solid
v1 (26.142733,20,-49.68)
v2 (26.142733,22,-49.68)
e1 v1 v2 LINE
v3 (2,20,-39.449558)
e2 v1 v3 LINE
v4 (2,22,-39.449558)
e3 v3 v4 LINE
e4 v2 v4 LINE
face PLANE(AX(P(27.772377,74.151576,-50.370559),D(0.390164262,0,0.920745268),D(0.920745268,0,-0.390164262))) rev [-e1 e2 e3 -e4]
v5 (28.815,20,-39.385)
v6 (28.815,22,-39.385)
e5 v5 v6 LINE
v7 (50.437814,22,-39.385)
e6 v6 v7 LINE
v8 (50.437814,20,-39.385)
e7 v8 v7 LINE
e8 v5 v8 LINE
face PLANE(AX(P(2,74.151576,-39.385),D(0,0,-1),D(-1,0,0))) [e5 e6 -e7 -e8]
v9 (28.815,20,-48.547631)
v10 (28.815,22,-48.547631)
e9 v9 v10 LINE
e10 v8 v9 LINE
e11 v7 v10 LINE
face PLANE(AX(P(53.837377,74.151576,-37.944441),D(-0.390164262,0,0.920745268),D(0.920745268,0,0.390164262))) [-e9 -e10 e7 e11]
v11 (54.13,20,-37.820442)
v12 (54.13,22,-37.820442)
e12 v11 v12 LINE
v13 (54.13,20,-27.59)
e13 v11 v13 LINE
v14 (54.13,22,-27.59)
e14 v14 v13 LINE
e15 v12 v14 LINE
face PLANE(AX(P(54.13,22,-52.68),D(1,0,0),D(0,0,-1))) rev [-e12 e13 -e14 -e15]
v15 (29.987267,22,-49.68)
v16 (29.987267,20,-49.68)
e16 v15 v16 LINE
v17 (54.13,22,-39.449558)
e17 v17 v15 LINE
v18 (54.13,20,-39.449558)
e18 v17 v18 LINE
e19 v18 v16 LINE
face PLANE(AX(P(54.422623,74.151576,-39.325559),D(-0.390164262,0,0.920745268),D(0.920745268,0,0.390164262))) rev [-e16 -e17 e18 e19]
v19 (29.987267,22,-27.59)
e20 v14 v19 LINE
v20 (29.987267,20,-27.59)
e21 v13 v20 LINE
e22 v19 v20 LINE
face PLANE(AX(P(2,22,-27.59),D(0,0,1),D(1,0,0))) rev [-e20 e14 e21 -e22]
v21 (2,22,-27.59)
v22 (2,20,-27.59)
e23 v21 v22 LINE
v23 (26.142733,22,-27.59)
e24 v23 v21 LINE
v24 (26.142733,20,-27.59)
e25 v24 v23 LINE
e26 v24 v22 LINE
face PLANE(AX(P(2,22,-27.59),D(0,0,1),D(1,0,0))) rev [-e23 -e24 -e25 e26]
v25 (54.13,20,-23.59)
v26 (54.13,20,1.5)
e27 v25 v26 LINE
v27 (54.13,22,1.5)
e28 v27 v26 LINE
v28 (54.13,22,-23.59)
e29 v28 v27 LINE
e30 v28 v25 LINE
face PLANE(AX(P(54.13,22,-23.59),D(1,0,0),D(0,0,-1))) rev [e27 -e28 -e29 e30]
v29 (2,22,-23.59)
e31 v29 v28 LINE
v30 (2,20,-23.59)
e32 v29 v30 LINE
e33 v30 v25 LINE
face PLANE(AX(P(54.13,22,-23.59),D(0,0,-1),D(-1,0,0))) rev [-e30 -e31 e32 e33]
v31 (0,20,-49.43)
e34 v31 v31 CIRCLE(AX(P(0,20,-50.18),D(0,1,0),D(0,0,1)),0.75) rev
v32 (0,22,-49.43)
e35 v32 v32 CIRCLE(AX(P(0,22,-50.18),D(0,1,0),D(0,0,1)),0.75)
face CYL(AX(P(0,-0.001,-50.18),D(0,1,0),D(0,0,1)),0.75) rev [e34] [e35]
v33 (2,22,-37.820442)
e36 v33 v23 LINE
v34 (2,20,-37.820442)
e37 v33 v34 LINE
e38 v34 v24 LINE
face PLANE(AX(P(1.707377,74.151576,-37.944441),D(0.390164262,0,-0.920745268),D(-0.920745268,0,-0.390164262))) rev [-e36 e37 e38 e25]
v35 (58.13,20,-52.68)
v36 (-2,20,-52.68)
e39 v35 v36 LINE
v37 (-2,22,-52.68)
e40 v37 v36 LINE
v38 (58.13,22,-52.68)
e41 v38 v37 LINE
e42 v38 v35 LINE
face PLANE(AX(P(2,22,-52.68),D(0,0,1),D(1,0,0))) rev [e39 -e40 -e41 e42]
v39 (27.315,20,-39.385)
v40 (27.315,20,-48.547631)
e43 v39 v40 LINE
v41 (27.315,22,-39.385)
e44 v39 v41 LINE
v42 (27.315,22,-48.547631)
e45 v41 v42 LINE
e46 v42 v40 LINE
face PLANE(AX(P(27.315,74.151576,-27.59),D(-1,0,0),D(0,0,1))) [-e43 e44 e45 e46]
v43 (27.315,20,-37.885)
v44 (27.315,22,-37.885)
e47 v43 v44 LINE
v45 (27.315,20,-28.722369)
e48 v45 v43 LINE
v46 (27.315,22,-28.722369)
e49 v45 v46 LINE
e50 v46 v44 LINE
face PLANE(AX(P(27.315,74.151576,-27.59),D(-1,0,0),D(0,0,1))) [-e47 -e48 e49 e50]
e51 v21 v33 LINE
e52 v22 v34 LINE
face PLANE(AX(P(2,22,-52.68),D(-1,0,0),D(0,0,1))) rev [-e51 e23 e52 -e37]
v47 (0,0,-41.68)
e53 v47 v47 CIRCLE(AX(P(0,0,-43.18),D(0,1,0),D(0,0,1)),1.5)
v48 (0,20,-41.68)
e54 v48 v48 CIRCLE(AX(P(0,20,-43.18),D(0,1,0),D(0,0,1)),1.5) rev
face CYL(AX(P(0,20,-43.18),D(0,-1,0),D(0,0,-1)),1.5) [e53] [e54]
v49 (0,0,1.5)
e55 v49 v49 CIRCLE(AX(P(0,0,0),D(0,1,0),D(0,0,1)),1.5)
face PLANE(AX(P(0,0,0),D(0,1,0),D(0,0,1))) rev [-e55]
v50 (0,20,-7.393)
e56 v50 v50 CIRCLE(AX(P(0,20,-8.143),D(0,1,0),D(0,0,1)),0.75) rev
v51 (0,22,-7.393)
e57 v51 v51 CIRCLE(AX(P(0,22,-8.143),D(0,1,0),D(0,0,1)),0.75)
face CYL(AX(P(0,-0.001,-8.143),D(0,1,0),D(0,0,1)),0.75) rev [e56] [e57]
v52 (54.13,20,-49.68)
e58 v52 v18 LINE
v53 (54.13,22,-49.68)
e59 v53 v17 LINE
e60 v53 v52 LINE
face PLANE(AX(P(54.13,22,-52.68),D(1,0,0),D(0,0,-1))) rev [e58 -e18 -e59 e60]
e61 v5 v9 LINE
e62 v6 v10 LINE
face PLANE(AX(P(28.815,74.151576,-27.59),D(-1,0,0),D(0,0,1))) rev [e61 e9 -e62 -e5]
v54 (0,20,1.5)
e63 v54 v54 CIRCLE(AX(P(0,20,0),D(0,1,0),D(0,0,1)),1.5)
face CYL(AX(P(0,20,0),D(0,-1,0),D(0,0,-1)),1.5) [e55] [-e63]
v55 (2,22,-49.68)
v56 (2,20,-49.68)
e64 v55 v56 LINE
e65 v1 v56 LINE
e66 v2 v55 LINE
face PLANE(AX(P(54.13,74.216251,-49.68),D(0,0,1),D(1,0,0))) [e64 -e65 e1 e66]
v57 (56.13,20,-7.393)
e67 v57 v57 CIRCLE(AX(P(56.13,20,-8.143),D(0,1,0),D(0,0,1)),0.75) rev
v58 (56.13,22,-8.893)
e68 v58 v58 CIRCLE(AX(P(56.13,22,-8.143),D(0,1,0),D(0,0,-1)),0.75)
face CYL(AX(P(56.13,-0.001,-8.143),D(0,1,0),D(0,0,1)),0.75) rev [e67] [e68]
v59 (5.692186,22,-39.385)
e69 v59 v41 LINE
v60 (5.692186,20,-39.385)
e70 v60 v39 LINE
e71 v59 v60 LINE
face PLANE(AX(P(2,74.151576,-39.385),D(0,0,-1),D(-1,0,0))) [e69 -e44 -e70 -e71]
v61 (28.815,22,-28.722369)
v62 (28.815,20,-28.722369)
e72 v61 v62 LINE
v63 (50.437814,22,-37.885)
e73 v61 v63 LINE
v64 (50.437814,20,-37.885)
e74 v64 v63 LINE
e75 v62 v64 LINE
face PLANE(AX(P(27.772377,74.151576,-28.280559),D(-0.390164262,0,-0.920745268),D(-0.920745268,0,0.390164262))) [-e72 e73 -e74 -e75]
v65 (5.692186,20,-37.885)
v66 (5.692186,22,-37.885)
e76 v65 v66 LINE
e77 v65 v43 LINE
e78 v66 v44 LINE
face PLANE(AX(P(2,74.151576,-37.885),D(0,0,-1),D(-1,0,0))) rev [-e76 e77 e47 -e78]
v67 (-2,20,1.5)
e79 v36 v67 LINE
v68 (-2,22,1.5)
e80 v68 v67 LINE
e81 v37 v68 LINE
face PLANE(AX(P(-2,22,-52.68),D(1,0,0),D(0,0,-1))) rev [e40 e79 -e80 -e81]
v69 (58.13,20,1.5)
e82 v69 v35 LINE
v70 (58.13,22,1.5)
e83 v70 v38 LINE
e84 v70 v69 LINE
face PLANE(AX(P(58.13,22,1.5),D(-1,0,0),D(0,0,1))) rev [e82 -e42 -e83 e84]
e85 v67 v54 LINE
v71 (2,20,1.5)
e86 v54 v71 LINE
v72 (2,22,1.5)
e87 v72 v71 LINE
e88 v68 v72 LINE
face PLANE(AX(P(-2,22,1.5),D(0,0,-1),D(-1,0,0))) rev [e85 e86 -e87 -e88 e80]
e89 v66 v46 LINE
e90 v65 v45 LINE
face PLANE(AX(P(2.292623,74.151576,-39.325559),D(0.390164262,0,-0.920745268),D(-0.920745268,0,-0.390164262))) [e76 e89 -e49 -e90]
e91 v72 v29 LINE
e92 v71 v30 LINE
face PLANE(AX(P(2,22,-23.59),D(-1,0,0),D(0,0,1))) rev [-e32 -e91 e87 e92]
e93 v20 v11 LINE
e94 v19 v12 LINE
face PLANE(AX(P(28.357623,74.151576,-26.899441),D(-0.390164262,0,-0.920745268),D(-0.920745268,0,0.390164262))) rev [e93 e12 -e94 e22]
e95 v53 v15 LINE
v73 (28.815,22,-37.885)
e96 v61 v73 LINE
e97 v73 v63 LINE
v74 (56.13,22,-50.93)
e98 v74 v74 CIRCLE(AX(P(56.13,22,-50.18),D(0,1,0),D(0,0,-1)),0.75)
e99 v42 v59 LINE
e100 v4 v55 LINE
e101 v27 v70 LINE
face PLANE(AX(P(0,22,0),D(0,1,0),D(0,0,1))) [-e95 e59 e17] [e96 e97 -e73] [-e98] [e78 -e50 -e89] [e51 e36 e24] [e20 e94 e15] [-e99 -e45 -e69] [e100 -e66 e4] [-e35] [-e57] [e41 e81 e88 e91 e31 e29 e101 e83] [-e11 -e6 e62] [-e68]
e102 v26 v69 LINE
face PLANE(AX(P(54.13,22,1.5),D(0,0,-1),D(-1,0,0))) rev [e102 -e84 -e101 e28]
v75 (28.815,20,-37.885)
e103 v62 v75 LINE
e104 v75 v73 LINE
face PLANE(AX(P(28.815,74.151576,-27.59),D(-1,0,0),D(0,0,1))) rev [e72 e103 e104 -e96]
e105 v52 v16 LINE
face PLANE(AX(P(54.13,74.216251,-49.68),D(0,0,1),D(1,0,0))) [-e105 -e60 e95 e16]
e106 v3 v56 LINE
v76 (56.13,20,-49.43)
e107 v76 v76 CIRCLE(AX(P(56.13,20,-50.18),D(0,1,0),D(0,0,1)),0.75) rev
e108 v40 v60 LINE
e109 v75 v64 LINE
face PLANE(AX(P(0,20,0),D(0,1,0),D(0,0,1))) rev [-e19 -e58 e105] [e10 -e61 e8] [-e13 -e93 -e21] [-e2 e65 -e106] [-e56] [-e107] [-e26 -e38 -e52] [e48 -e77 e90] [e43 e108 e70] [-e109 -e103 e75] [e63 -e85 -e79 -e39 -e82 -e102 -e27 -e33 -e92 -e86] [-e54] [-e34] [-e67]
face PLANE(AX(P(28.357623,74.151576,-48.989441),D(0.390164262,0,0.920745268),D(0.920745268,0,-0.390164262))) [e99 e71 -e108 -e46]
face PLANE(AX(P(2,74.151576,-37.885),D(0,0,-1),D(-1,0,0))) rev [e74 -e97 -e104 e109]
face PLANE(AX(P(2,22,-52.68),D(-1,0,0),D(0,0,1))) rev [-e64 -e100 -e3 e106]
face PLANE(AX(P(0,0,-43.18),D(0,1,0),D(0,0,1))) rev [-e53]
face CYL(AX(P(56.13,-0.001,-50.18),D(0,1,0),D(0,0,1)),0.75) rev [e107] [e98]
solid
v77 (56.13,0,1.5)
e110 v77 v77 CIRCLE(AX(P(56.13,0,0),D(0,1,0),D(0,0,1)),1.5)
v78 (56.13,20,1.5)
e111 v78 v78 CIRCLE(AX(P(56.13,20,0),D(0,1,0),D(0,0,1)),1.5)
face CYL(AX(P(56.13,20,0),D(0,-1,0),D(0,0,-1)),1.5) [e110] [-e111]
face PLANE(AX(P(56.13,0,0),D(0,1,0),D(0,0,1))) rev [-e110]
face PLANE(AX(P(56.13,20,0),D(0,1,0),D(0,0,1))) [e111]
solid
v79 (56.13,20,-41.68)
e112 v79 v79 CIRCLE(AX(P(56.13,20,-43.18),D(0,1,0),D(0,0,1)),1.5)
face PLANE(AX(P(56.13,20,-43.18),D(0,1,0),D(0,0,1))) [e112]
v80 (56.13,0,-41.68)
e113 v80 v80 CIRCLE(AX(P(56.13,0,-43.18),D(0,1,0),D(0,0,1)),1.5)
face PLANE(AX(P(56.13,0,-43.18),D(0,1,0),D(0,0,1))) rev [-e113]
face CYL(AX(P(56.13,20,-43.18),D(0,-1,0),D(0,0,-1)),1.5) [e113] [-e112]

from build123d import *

# Parameters (mm, degrees)
SKETCH_1_R          = 1.5
EXTRUDE_1_DEPTH     = 20
EXTRUDE_1_2_DEPTH   = 20
EXTRUDE_1_3_DEPTH   = 20
EXTRUDE_1_4_DEPTH   = 20
EXTRUDE_2_DEPTH     = 2
SKETCH_4_R          = 0.75
CUT_EXTRUDE_1_DEPTH = 2
SKETCH_5_W          = 52.13
SKETCH_5_H          = 3
EXTRUDE_3_DEPTH     = 2
EXTRUDE_START       = -2
EXTRUDE_3_2_DEPTH   = 2


# Read off the part's stored shape, not the designer's step: 拉伸-薄壁3
with BuildPart() as part:
    # 草图1 → 凸台-拉伸1 (new body)
    with BuildSketch(Plane(origin=(0, 0, 0), x_dir=(1, 0, 0), z_dir=(0, 1, 0))):
        with Locations(Location((0, 0, 0), (0, 0, 270))):
            Circle(SKETCH_1_R)
    extrude(amount=EXTRUDE_1_DEPTH)



with BuildPart() as body_2:
    # 草图1 → Extrude 1 2 (new body)
    with BuildSketch(Plane(origin=(0, 0, 0), x_dir=(1, 0, 0), z_dir=(0, 1, 0))):
        with Locations(Location((0, 43.18, 0), (0, 0, 270))):
            Circle(SKETCH_1_R)
    extrude(amount=EXTRUDE_1_2_DEPTH)


with BuildPart() as body_3:
    # 草图1 → Extrude 1 3 (new body)
    with BuildSketch(Plane(origin=(0, 0, 0), x_dir=(1, 0, 0), z_dir=(0, 1, 0))):
        with Locations(Location((56.13, 43.18, 0), (0, 0, 270))):
            Circle(SKETCH_1_R)
    extrude(amount=EXTRUDE_1_3_DEPTH)


with BuildPart() as body_4:
    # 草图1 → Extrude 1 4 (new body)
    with BuildSketch(Plane(origin=(0, 0, 0), x_dir=(1, 0, 0), z_dir=(0, 1, 0))):
        with Locations(Location((56.13, 0, 0), (0, 0, 270))):
            Circle(SKETCH_1_R)
    extrude(amount=EXTRUDE_1_4_DEPTH)


with BuildPart() as part_1:
    add(part.part)

    add(body_2.part)  # 凸台-拉伸2 merges body 2
    # 草图2 → 凸台-拉伸2 (add)
    with BuildSketch(Plane(origin=(0, 20, 0), x_dir=(1, 0, 0), z_dir=(0, 1, 0))):
        Polygon((-2, 52.68), (-2, -1.5), (2, -1.5), (2, 23.59), (54.13, 23.59), (54.13, -1.5), (58.13, -1.5), (58.13, 52.68), (54.13, 52.68), (54.13, 27.59), (2, 27.59), (2, 52.68), align=None)
    extrude(amount=EXTRUDE_2_DEPTH)

    # 草图4 → 切除-拉伸1 (cut)
    with BuildSketch(Plane(origin=(0, 22, 0), x_dir=(1, 0, 0), z_dir=(0, 1, 0))):
        with Locations(Location((0, 50.18, 0), (0, 0, 270))):
            Circle(SKETCH_4_R)
        with Locations(Location((0, 8.143, 0), (0, 0, 270))):
            Circle(SKETCH_4_R)
        with Locations(Location((56.13, 8.143, 0), (0, 0, 270))):
            Circle(SKETCH_4_R)
        with Locations(Location((56.13, 50.18, 0), (0, 0, 270))):
            Circle(SKETCH_4_R)
    extrude(amount=-CUT_EXTRUDE_1_DEPTH, mode=Mode.SUBTRACT)

    # 草图5 → Extrude 3 (add)
    with BuildSketch(Plane.XZ.offset(-20)):
        with Locations((28.065, -51.18)):
            Rectangle(SKETCH_5_W, SKETCH_5_H)
    extrude(amount=-EXTRUDE_3_DEPTH)

    # Extrude 3 2 outline → Extrude 3 2 (add)
    with BuildSketch(Plane.XZ.offset(-20).offset(EXTRUDE_START)):
        Polygon((26.142732706, -27.59), (2, -37.820442461), (2, -39.449557539), (26.142732706, -49.68), (29.987267294, -49.68), (54.13, -39.449557539), (54.13, -37.820442461), (29.987267294, -27.59), align=None)
        Polygon((27.315, -48.547631219), (5.692185809, -39.385), (27.315, -39.385), align=None, mode=Mode.SUBTRACT)
        Polygon((28.815, -39.385), (50.437814191, -39.385), (28.815, -48.547631219), align=None, mode=Mode.SUBTRACT)
        Polygon((27.315, -37.885), (5.692185809, -37.885), (27.315, -28.722368781), align=None, mode=Mode.SUBTRACT)
        Polygon((28.815, -37.885), (28.815, -28.722368781), (50.437814191, -37.885), align=None, mode=Mode.SUBTRACT)
    extrude(amount=EXTRUDE_3_2_DEPTH)


solid = Compound([body_3.part, body_4.part, part_1.part])
